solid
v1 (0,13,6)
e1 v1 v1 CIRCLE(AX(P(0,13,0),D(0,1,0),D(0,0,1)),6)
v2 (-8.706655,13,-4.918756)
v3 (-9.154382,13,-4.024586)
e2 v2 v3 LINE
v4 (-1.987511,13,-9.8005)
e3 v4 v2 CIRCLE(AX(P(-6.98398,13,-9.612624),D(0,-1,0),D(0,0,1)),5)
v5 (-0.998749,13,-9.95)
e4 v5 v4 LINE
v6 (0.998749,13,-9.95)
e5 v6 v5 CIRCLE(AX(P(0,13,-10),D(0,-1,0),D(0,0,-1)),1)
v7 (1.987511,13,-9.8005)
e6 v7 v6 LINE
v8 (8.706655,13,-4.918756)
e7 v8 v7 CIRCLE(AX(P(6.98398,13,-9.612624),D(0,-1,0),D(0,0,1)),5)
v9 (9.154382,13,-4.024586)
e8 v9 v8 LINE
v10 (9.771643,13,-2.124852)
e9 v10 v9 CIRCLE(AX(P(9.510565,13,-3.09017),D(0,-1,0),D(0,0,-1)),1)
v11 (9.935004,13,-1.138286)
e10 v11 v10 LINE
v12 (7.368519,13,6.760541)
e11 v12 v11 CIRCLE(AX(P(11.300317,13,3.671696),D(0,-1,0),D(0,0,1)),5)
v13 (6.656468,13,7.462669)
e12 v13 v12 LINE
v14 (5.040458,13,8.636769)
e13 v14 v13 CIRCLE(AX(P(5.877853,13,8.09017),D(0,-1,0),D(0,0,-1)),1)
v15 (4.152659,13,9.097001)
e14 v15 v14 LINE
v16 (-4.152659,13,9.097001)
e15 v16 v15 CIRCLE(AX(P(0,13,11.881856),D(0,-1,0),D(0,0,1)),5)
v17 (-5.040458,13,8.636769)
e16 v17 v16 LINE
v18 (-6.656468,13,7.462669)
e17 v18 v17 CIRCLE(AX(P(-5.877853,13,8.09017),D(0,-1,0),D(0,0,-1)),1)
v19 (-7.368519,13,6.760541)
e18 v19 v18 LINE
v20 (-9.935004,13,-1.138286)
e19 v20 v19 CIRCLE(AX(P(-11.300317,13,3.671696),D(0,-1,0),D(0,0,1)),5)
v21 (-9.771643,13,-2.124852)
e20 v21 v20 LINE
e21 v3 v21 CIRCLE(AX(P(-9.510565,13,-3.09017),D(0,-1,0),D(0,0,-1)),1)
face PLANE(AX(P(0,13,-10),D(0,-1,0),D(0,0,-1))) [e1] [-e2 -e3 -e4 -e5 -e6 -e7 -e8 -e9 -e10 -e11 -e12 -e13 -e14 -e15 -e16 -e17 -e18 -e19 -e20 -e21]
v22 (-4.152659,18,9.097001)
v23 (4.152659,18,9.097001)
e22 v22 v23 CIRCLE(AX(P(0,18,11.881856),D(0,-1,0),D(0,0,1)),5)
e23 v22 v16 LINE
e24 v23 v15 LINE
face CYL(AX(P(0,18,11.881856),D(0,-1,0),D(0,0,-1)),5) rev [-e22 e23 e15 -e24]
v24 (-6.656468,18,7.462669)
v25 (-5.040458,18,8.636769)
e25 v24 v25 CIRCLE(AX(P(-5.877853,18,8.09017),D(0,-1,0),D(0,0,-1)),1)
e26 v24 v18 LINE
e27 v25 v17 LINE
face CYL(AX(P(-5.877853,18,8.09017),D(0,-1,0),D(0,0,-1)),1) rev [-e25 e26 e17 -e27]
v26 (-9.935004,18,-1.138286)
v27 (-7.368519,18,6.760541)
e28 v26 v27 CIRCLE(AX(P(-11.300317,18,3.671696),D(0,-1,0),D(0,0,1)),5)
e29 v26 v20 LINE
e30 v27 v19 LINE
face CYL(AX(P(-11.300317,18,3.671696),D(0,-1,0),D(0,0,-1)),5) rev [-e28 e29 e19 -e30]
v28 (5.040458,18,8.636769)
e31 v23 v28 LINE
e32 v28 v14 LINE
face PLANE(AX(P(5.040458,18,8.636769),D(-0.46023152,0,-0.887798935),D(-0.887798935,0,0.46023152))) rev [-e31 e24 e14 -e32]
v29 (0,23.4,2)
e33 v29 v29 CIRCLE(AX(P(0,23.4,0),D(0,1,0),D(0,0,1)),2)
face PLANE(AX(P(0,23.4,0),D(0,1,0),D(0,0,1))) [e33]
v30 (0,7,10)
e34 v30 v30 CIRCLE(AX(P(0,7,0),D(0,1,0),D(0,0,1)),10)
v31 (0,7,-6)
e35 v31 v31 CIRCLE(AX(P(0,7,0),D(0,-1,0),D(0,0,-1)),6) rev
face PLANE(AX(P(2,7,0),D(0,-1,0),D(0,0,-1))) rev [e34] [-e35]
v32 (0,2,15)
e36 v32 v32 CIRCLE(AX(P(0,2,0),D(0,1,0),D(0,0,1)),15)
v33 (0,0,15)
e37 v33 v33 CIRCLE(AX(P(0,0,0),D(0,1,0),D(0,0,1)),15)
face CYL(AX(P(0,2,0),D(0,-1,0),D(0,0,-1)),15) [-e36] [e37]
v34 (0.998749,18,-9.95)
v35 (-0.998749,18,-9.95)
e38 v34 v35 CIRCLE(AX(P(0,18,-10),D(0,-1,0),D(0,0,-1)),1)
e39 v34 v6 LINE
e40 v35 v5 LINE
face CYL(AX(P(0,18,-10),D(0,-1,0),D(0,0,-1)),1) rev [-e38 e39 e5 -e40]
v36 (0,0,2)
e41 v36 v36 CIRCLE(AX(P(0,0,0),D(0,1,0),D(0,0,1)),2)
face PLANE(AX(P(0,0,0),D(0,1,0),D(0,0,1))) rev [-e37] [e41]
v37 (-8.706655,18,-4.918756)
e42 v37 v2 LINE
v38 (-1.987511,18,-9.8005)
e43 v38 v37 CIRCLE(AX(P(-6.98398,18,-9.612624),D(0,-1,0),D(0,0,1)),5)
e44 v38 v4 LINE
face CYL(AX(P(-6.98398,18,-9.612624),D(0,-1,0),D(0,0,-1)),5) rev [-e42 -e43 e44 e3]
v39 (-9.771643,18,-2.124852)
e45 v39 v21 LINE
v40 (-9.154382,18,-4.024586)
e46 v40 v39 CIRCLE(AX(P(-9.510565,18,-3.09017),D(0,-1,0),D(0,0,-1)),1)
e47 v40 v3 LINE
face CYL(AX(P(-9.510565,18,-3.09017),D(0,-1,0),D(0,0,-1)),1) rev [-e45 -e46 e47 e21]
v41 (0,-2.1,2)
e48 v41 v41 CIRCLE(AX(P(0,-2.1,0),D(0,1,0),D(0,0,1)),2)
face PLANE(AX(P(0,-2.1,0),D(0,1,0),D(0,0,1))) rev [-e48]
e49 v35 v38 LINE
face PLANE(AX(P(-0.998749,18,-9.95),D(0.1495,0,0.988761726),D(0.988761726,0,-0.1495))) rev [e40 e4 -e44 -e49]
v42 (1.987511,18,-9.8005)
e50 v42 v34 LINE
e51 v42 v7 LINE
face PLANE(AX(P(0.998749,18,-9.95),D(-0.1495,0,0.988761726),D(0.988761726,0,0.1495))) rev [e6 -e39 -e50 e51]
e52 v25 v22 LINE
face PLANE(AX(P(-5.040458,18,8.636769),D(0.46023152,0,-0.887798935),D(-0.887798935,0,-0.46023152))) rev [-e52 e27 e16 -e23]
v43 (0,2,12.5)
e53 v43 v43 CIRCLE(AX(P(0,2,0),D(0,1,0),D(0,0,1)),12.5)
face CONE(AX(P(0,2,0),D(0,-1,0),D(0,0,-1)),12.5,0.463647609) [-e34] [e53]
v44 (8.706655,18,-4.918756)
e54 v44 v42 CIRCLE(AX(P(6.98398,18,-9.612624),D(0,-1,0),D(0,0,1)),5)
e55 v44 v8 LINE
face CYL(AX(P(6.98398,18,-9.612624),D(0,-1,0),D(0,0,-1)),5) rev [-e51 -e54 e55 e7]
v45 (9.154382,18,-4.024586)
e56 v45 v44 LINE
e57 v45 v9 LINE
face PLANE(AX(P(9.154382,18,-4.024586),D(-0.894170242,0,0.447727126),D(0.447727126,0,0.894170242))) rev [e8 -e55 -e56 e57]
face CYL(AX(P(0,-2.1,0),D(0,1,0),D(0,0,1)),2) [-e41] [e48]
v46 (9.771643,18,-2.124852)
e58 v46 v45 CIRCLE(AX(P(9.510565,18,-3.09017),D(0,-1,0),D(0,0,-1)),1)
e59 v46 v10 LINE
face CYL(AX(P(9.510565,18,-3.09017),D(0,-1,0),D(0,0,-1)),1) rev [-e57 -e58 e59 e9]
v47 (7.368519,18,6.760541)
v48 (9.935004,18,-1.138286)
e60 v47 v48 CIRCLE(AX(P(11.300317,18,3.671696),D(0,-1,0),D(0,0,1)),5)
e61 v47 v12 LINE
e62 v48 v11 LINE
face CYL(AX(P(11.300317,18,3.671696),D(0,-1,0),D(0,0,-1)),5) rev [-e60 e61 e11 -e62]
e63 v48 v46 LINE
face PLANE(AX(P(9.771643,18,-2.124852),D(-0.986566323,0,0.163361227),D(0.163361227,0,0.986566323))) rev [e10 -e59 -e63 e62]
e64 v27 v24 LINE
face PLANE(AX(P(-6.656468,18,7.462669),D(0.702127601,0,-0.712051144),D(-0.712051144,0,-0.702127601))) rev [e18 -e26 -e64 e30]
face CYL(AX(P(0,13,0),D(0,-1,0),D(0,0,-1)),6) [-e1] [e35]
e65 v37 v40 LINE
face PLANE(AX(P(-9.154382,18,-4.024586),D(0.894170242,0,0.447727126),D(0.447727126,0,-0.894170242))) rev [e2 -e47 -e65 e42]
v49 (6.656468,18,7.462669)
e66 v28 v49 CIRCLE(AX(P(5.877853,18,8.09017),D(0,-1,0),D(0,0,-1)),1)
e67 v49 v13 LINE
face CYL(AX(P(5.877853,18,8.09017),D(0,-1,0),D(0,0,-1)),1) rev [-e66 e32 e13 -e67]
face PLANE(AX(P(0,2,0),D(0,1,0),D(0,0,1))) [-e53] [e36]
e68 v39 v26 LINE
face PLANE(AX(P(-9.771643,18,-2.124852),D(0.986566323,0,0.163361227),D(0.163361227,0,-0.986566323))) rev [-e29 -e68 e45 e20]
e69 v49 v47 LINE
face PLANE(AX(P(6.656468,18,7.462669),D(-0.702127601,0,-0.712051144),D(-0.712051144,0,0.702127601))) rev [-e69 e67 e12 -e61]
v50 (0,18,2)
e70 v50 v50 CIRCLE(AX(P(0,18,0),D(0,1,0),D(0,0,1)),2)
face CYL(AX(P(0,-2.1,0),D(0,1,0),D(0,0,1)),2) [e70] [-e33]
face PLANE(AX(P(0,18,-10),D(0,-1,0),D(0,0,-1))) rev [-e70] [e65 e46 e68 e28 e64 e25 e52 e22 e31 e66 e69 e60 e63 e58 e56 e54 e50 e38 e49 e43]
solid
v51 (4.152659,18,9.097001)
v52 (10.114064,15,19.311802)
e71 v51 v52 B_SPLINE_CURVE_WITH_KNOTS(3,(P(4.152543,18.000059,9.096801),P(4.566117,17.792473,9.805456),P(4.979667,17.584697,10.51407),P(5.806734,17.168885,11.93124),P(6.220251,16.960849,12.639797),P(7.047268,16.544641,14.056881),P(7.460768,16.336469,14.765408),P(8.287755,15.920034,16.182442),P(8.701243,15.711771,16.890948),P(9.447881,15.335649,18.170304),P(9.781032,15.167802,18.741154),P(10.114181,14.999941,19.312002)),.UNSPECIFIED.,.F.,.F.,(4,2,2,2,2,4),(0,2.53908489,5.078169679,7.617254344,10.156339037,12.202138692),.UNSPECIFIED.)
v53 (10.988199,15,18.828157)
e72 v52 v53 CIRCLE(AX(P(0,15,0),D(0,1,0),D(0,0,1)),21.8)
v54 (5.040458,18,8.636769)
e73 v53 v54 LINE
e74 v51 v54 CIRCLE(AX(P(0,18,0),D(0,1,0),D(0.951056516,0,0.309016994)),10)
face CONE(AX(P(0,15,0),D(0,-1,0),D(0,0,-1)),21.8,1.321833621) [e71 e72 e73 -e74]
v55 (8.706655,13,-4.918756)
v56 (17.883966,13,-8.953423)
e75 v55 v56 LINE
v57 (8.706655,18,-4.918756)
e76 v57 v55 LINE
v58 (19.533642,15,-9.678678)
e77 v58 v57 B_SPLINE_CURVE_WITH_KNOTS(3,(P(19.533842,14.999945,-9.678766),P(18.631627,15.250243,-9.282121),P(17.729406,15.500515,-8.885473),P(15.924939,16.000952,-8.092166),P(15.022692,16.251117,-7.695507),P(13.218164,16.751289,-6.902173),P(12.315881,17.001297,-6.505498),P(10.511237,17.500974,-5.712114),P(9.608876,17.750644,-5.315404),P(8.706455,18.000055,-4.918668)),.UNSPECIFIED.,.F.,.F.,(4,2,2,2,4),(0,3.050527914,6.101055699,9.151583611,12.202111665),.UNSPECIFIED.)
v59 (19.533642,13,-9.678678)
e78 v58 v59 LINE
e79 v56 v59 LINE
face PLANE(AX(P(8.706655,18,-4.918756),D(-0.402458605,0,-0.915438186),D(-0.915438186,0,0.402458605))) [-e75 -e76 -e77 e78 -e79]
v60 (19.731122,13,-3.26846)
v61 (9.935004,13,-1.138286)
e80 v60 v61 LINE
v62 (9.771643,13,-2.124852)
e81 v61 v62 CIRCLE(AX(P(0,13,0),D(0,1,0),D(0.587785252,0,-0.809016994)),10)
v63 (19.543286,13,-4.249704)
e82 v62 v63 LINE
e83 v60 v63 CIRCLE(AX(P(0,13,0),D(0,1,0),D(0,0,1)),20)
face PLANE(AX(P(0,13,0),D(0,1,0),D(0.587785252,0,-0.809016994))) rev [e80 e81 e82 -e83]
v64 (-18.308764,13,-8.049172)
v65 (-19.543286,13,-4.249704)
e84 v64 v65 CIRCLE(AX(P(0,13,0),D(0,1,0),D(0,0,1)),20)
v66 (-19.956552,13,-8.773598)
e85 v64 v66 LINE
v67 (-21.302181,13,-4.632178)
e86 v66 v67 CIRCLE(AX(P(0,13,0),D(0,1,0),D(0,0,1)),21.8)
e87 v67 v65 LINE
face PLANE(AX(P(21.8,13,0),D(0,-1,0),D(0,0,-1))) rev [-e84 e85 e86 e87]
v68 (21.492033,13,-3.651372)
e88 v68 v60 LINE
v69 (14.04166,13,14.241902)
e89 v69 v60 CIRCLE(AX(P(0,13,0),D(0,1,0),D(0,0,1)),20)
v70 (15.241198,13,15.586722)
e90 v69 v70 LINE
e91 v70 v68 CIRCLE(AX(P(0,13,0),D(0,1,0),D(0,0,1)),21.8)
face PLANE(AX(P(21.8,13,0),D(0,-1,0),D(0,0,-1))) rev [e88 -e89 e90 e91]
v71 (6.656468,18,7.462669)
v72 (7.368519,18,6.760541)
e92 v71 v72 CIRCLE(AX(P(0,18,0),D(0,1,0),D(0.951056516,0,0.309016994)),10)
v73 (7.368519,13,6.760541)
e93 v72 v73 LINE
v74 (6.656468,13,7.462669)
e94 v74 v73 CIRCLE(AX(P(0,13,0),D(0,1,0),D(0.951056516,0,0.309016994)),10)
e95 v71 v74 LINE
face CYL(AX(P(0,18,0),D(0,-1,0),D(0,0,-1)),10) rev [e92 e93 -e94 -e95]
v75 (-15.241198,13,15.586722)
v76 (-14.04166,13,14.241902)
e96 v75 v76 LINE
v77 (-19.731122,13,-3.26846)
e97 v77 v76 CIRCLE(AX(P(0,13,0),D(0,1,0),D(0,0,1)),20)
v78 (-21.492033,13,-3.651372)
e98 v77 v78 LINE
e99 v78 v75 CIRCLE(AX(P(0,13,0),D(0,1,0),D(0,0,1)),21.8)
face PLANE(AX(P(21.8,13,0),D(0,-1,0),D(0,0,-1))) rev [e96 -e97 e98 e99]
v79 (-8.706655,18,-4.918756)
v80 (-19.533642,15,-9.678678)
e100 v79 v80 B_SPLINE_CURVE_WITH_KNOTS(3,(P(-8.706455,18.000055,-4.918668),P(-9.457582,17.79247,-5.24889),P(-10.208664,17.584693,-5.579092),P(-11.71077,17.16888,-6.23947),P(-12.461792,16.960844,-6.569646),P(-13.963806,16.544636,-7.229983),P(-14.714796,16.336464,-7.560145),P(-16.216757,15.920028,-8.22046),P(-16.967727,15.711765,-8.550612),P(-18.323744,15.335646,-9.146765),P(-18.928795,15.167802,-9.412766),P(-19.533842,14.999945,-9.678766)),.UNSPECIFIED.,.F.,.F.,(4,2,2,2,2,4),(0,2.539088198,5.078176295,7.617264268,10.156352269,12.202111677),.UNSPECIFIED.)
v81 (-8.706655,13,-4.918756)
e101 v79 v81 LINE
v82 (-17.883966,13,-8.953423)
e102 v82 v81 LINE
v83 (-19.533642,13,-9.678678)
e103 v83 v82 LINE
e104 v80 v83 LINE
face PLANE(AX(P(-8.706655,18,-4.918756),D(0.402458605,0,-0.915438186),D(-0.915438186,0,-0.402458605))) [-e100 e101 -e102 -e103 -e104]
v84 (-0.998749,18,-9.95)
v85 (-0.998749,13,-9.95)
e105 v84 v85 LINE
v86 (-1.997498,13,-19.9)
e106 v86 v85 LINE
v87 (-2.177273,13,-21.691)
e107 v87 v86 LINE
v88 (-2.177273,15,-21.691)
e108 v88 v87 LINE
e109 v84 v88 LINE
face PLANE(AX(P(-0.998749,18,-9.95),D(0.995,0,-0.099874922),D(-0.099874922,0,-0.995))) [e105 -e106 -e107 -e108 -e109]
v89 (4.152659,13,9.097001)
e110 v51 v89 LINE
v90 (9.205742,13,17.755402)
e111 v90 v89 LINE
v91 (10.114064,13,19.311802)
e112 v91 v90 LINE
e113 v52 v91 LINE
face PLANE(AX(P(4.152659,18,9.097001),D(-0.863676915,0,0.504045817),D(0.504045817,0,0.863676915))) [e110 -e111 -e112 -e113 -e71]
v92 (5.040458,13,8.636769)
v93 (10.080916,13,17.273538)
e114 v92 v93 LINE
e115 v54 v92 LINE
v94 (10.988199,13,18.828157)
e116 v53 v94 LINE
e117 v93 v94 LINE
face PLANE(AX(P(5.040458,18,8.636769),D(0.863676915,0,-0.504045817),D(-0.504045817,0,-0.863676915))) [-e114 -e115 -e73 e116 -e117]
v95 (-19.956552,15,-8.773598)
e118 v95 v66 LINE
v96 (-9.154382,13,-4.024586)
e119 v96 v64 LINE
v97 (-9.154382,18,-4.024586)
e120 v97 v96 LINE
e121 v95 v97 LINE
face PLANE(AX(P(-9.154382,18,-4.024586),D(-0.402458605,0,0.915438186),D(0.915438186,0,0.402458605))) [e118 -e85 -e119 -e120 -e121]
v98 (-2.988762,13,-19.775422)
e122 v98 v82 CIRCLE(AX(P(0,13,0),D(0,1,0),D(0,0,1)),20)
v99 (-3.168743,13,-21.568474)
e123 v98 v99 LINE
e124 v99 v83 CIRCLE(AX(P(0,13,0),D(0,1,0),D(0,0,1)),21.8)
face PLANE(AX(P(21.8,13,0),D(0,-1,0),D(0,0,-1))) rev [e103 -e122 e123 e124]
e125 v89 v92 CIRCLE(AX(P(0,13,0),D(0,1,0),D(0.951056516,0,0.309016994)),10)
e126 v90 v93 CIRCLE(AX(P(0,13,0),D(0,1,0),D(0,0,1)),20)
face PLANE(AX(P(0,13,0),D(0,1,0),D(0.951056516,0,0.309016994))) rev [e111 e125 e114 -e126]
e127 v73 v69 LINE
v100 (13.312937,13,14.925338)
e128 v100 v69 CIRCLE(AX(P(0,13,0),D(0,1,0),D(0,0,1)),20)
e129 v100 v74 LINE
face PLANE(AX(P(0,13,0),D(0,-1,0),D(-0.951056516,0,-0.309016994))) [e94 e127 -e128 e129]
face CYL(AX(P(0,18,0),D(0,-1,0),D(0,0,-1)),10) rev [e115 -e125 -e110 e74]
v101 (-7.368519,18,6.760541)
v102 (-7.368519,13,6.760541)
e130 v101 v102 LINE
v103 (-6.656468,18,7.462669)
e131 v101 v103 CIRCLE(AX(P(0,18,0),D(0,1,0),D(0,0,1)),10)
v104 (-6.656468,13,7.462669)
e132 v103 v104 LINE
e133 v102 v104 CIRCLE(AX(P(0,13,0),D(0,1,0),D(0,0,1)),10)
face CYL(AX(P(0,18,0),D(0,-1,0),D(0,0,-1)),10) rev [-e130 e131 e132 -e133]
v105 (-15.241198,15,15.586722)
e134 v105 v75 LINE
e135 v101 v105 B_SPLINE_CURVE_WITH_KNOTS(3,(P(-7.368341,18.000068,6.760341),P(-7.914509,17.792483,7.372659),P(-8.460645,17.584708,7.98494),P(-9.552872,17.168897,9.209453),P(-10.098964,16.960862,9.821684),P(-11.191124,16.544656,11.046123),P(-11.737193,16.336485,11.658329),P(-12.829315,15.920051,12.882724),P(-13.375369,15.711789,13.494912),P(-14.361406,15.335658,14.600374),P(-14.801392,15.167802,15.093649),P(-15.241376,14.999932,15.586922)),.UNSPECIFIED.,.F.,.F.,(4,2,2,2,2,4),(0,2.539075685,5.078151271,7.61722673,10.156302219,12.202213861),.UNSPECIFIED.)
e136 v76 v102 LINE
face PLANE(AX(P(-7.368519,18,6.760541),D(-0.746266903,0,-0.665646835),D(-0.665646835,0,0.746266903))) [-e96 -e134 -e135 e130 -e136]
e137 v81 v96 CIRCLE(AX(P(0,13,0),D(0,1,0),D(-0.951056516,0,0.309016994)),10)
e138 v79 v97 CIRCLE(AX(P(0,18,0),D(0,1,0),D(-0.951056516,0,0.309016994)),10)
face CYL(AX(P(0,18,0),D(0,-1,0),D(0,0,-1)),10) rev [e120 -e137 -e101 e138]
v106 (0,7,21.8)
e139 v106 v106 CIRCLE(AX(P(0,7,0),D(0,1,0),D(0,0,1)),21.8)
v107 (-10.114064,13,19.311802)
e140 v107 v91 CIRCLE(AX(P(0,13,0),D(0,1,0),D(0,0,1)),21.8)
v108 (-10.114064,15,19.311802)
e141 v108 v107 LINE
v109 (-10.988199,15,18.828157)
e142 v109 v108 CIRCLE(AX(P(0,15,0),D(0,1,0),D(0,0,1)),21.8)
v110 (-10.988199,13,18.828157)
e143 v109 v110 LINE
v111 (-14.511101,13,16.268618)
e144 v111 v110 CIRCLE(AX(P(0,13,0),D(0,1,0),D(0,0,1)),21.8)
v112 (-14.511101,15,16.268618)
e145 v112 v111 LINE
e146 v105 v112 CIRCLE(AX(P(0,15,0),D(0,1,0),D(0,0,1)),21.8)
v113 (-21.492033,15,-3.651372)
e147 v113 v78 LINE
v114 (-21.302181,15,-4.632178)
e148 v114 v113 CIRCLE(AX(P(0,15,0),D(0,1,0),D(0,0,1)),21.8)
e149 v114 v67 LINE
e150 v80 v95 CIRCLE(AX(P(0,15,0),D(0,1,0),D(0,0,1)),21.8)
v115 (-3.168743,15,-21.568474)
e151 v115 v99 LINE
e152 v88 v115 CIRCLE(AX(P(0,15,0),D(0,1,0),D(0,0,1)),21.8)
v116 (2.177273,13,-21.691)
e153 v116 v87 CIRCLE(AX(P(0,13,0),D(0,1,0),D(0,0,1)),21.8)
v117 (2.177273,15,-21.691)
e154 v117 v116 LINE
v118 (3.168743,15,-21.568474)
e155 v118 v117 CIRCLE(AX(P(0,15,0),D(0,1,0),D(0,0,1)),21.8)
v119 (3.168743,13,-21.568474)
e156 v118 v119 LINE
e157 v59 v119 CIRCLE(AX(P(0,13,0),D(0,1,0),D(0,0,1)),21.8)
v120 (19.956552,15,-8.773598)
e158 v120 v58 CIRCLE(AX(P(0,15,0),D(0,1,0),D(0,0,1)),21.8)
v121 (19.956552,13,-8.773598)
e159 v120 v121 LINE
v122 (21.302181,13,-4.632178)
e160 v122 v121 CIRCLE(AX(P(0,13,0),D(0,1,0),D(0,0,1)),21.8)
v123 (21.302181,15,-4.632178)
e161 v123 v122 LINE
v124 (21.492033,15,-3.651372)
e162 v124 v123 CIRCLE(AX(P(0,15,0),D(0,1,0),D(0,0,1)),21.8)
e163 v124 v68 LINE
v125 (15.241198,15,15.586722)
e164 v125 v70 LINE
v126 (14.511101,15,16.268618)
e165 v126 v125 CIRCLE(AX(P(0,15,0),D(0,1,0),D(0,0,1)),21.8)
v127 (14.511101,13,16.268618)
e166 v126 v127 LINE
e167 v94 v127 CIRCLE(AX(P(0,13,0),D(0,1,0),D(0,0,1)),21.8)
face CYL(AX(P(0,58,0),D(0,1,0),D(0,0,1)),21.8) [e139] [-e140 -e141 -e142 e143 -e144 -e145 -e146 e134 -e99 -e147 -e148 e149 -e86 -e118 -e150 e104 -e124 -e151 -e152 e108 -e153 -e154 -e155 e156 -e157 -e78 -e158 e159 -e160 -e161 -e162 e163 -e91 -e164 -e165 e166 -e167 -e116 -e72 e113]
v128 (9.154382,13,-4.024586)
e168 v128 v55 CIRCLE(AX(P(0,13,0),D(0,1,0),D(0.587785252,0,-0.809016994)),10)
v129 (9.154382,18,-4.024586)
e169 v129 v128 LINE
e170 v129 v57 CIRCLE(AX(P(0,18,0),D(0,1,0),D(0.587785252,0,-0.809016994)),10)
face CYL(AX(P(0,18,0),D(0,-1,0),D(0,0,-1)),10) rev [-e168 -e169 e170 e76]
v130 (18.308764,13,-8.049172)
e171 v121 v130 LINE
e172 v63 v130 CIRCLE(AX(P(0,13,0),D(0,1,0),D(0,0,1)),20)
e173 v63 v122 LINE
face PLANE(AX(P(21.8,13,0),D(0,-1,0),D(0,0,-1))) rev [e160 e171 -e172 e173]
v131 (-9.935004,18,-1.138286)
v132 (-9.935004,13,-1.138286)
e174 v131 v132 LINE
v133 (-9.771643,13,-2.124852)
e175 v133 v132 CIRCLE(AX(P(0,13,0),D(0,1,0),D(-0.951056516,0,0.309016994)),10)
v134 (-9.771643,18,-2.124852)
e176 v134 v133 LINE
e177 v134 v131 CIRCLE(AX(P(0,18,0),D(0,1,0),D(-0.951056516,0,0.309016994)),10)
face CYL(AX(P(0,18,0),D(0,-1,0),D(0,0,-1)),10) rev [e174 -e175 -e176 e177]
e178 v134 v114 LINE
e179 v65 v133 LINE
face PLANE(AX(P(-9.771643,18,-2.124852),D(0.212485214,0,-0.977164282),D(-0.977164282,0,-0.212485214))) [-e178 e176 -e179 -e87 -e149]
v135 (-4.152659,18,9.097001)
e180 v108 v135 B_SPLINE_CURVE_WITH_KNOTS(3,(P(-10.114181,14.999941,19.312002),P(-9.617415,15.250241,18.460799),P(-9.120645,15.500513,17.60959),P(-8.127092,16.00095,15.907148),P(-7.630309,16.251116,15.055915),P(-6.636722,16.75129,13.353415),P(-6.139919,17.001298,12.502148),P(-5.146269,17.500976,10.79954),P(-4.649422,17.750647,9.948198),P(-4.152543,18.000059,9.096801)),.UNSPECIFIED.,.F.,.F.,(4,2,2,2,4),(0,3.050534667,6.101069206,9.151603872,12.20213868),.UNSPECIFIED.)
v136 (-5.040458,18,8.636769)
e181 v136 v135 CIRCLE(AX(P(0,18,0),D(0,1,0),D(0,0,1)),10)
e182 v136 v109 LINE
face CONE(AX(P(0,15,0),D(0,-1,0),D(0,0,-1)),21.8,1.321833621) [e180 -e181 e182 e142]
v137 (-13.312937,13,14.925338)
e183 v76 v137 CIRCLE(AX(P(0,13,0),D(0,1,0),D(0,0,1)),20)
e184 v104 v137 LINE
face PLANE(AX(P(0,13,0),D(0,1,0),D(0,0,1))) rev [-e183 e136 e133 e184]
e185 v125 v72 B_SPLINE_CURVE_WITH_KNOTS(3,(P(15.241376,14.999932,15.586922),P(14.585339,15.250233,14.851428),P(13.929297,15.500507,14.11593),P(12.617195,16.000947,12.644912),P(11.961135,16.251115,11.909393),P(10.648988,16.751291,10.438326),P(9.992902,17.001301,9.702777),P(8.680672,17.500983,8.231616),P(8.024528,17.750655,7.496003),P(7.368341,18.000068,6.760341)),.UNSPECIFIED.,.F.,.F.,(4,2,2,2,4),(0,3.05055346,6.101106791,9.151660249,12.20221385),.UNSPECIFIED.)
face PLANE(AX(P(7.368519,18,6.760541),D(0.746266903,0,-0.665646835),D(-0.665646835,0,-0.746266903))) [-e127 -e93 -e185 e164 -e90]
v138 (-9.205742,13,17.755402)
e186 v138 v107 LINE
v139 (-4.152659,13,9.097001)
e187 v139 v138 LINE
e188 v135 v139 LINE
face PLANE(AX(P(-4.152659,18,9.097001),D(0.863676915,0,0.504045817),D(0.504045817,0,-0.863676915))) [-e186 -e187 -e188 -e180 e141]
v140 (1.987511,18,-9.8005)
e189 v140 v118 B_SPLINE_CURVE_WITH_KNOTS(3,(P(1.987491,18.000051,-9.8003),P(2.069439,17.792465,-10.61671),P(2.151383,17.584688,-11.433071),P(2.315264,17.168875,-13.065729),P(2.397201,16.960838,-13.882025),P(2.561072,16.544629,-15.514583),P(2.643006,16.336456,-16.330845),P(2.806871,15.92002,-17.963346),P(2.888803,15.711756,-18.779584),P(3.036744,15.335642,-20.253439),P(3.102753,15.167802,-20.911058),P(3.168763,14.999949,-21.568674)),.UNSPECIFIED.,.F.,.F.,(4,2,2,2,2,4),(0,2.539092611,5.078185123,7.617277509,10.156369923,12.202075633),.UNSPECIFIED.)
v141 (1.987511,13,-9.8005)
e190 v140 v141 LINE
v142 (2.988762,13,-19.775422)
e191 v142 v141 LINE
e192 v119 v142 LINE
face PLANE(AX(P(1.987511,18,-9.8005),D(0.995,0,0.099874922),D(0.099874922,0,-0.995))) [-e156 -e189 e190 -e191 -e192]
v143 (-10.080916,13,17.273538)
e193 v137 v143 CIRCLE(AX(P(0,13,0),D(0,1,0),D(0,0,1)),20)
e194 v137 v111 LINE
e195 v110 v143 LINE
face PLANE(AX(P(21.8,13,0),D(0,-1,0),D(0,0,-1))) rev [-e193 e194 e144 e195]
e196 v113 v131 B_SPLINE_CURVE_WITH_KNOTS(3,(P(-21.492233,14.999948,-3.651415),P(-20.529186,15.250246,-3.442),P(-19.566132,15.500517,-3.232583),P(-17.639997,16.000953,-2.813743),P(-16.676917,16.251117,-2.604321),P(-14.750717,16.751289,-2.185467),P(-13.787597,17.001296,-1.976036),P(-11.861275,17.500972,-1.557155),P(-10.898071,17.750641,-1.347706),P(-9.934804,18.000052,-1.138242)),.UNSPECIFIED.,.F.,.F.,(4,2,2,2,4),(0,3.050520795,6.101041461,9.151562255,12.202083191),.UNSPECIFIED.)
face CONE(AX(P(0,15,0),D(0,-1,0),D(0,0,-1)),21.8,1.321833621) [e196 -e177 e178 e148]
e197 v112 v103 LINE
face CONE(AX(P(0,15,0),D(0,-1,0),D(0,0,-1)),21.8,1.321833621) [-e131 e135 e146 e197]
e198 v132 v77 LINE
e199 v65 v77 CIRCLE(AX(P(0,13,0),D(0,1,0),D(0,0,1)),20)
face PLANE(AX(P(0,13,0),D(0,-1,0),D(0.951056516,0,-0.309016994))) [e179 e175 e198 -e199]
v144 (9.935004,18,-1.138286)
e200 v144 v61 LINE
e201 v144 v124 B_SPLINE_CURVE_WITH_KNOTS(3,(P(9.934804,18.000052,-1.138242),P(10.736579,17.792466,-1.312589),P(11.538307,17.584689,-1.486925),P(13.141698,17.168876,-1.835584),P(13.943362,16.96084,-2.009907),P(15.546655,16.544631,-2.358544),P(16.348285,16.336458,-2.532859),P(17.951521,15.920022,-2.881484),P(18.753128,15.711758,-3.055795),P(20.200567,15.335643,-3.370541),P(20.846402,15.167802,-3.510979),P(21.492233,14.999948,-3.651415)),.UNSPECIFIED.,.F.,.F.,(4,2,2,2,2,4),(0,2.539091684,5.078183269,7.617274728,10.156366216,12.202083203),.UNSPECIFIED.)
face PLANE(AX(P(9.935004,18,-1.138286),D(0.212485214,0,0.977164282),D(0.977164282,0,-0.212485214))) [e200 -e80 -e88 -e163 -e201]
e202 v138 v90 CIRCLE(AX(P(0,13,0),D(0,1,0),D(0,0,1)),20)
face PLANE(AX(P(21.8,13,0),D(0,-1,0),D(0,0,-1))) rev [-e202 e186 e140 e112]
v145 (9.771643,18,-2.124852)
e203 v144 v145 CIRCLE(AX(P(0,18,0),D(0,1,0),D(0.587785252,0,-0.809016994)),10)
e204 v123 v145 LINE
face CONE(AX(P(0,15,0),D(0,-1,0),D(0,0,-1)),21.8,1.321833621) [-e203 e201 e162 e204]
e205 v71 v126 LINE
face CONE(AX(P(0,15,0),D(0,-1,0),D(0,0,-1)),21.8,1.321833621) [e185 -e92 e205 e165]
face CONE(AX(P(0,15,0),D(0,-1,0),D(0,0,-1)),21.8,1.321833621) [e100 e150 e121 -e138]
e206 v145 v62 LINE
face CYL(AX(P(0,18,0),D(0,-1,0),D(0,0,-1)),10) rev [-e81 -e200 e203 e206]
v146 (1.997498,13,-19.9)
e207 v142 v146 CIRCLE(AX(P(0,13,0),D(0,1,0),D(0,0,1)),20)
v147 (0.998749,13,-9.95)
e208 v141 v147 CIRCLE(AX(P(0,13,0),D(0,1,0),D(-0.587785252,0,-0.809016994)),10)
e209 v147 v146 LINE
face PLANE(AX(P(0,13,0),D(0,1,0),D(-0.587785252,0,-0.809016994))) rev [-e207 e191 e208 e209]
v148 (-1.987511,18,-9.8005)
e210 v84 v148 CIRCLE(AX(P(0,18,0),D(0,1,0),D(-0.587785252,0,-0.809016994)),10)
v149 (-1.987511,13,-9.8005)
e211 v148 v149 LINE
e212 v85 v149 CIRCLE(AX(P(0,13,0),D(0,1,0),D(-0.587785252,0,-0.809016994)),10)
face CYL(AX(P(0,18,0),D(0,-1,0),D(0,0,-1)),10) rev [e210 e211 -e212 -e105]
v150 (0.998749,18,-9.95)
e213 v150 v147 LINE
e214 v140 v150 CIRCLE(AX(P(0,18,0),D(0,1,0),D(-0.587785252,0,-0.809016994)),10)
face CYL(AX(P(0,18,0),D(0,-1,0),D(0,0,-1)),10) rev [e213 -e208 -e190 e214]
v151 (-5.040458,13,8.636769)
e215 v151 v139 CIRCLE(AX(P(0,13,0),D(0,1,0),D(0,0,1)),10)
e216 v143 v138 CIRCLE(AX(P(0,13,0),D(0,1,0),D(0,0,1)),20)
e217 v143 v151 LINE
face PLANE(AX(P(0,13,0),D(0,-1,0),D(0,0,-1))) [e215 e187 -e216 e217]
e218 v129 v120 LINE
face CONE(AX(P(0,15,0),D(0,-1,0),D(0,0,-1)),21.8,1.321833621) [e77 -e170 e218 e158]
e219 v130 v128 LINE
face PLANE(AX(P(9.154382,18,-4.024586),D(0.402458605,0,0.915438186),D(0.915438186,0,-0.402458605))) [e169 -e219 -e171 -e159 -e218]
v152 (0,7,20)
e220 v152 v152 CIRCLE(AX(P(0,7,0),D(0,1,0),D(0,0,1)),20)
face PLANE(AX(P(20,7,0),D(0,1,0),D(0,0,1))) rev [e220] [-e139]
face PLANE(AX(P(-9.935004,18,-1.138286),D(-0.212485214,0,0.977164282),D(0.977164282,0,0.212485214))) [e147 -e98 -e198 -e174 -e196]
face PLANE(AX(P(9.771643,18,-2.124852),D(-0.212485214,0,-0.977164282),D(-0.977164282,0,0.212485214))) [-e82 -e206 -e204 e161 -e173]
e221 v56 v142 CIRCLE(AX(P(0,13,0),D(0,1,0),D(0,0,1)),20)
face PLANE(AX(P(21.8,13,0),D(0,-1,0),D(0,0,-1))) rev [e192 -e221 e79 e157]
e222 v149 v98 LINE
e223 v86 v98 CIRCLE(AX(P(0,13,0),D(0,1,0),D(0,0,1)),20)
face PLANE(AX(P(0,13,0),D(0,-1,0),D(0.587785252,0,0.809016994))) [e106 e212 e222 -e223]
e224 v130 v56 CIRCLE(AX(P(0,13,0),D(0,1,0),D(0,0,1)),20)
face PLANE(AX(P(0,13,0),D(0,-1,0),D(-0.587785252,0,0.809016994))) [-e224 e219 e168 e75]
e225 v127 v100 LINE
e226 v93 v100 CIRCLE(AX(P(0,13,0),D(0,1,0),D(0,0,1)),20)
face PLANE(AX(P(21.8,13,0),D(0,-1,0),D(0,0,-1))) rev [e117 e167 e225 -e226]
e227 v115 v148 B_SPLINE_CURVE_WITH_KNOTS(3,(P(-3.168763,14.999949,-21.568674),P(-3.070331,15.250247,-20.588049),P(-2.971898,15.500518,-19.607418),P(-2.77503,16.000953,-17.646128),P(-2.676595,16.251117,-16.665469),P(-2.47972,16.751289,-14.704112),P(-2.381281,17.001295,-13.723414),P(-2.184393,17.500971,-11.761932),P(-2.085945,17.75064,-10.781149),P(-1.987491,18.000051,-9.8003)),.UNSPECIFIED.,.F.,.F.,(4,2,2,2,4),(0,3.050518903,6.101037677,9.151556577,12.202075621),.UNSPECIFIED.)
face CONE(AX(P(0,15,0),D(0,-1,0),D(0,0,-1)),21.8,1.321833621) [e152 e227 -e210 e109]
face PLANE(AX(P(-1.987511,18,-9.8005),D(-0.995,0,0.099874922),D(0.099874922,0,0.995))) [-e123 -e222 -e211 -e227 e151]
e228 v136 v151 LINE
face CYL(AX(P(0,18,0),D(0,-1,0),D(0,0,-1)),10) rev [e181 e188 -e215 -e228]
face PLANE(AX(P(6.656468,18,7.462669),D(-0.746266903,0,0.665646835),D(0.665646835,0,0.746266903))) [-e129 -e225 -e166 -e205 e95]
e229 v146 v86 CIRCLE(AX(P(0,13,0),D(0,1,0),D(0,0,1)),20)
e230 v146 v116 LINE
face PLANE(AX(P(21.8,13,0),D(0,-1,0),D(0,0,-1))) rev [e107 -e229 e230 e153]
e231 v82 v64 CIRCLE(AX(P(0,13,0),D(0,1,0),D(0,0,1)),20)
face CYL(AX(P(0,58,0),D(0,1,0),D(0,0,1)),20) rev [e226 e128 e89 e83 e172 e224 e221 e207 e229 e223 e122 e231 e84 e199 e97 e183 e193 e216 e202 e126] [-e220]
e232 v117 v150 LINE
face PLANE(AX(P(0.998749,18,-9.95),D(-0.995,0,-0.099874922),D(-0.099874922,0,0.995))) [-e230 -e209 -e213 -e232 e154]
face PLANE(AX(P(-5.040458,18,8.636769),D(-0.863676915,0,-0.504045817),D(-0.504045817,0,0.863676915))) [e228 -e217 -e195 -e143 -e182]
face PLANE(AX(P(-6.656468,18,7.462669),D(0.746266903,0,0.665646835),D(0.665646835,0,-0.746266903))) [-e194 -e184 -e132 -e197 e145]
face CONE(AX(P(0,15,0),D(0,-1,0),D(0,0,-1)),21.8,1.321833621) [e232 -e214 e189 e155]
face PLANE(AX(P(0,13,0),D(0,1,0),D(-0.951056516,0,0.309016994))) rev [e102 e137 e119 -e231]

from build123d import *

# Parameters (mm, degrees)
SKETCH_4_R               = 15
EXTRUDE_2_DEPTH          = 2
EXTRUDE_3_DEPTH          = 21.4
EXTRUDE_3_DEPTH_BACK     = 4.1
SKETCH_5_R               = 2
SKETCH_9_W               = 1.8
SKETCH_9_H               = 6
SKETCH_10_R              = 6
SKETCH_10_R_2            = 2
EXTRUDE_5_DEPTH          = 6
SKETCH_11_R              = 2
EXTRUDE_6_DEPTH          = 5
EXTRUDE_7_DEPTH          = 5
PATTERN_START            = 13
PATTERN_CIRCULAR_1_DEPTH = 5


# Read off the part's stored shape, not the designer's step: 阵列(圆周)1
with BuildPart() as part:
    # 草图4 → 凸台-拉伸2 (new body)
    with BuildSketch(Plane(origin=(0, 0, 0), x_dir=(1, 0, 0), z_dir=(0, 1, 0))):
        with Locations(Location((0, 0, 0), (0, 0, 270))):
            Circle(SKETCH_4_R)
    extrude(amount=EXTRUDE_2_DEPTH)

    # 草图5 → 凸台-拉伸3 (add, two sides: drawn at the far end of the back side and taken through both)
    with BuildSketch(Plane(origin=(0, 2, 0), x_dir=(1, 0, 0), z_dir=(0, 1, 0)).offset(-EXTRUDE_3_DEPTH_BACK)):
        with Locations(Location((0, 0, 0), (0, 0, 270))):
            Circle(SKETCH_5_R)
    extrude(amount=EXTRUDE_3_DEPTH + EXTRUDE_3_DEPTH_BACK)

    # 草图8 → 旋转2 (revolve)
    with BuildSketch(Plane.XY, mode=Mode.PRIVATE) as revolve_2_sk:
        Polygon((2, 2), (2, 7), (10, 7), (12.5, 2), align=None)
    revolve(revolve_2_sk.sketch.rotate(Axis((0, 58, 0), (0, -1, 0)), 90), axis=Axis((0, 58, 0), (0, -1, 0)))

    # 草图10 → 凸台-拉伸5 (add)
    with BuildSketch(Plane(origin=(0, 7, 0), x_dir=(1, 0, 0), z_dir=(0, 1, 0))):
        with Locations(Location((0, 0, 0), (0, 0, 90))):
            Circle(SKETCH_10_R)
        with Locations(Location((0, 0, 0), (0, 0, 270))):
            Circle(SKETCH_10_R_2, mode=Mode.SUBTRACT)
    extrude(amount=EXTRUDE_5_DEPTH)

    # 草图11 → 凸台-拉伸6 (add)
    with BuildSketch(Plane(origin=(0, 13, 0), x_dir=(1, 0, 0), z_dir=(0, 1, 0))):
        with BuildLine():
            Line((0.998749218, 9.95), (1.987510943, 9.8005))
            ThreePointArc((1.987510943, 9.8005), (4.045053686, 5.567538761), (8.70665473, 4.918756287))
            Line((8.70665473, 4.918756287), (9.154381856, 4.024586046))
            ThreePointArc((9.154381856, 4.024586046), (8.559508647, 2.781152949), (9.771642819, 2.124852142))
            Line((9.771642819, 2.124852142), (9.935004046, 1.138285819))
            ThreePointArc((9.935004046, 1.138285819), (6.54503435, -2.126610573), (7.368519495, -6.760541432))
            Line((7.368519495, -6.760541432), (6.656468351, -7.462669033))
            ThreePointArc((6.656468351, -7.462669033), (5.290067271, -7.281152949), (5.04045817, -8.636769155))
            Line((5.04045817, -8.636769155), (4.152659235, -9.097000675))
            ThreePointArc((4.152659235, -9.097000675), (0, -6.881856376), (-4.152659235, -9.097000675))
            Line((-4.152659235, -9.097000675), (-5.04045817, -8.636769155))
            ThreePointArc((-5.04045817, -8.636769155), (-5.290067271, -7.281152949), (-6.656468351, -7.462669033))
            Line((-6.656468351, -7.462669033), (-7.368519495, -6.760541432))
            ThreePointArc((-7.368519495, -6.760541432), (-6.54503435, -2.126610573), (-9.935004046, 1.138285819))
            Line((-9.935004046, 1.138285819), (-9.771642819, 2.124852142))
            ThreePointArc((-9.771642819, 2.124852142), (-8.559508647, 2.781152949), (-9.154381856, 4.024586046))
            Line((-9.154381856, 4.024586046), (-8.70665473, 4.918756287))
            ThreePointArc((-8.70665473, 4.918756287), (-4.045053686, 5.567538761), (-1.987510943, 9.8005))
            Line((-1.987510943, 9.8005), (-0.998749218, 9.95))
            ThreePointArc((-0.998749218, 9.95), (0, 9), (0.998749218, 9.95))
        make_face()
        with Locations(Location((0, 0, 0), (0, 0, 270))):
            Circle(SKETCH_11_R, mode=Mode.SUBTRACT)
    extrude(amount=EXTRUDE_6_DEPTH)


with BuildPart() as body_2:
    # 草图9 → 旋转3 (revolve)
    with BuildSketch(Plane.XY, mode=Mode.PRIVATE) as revolve_3_sk:
        with Locations((20.9, 10)):
            Rectangle(SKETCH_9_W, SKETCH_9_H)
    revolve(revolve_3_sk.sketch.rotate(Axis((0, 58, 0), (0, -1, 0)), 90), axis=Axis((0, 58, 0), (0, -1, 0)))

    # 草图13 → 凸台-拉伸7 (add)
    with BuildSketch(Plane.XZ.offset(-13)):
        with BuildLine():
            Line((-6.656468351, 7.462669033), (-14.511101004, 16.268618492))
            ThreePointArc((-14.511101004, 16.268618492), (-14.880055872, 15.931852913), (-15.241197529, 15.586721845))
            Line((-15.241197529, 15.586721845), (-7.368519495, 6.760541432))
            ThreePointArc((-7.368519495, 6.760541432), (-7.02127601, 7.120511442), (-6.656468351, 7.462669033))
        make_face()
        with BuildLine():
            Line((-5.04045817, 8.636769155), (-10.988198811, 18.828156758))
            ThreePointArc((-10.988198811, 18.828156758), (-10.553902387, 19.074987402), (-10.114064327, 19.311802163))
            Line((-10.114064327, 19.311802163), (-4.152659235, 9.097000675))
            ThreePointArc((-4.152659235, 9.097000675), (-4.602315197, 8.877989346), (-5.04045817, 8.636769155))
        make_face()
    extrude(amount=-EXTRUDE_7_DEPTH)

    # 阵列(圆周)1 outline → 阵列(圆周)1 (add)
    with BuildSketch(Plane(origin=(0, 0, 0), x_dir=(1, 0, 0), z_dir=(0, 1, 0)).offset(PATTERN_START)):
        with BuildLine():
            Line((-19.956552445, 8.77359758), (-9.154381856, 4.024586046))
            ThreePointArc((-9.154381856, 4.024586046), (-8.941702415, 4.477271258), (-8.70665473, 4.918756287))
            Line((-8.70665473, 4.918756287), (-19.533642429, 9.67867829))
            ThreePointArc((-19.533642429, 9.67867829), (-19.750282671, 9.228560799), (-19.956552445, 8.77359758))
        make_face()
        with BuildLine():
            Line((-9.771642819, 2.124852142), (-21.302181344, 4.63217767))
            ThreePointArc((-21.302181344, 4.63217767), (-21.402726262, 4.142862363), (-21.492033048, 3.651371724))
            Line((-21.492033048, 3.651371724), (-9.935004046, 1.138285819))
            ThreePointArc((-9.935004046, 1.138285819), (-9.865663228, 1.633612274), (-9.771642819, 2.124852142))
        make_face()
        with BuildLine():
            ThreePointArc((-2.177273295, 21.691), (-2.673709895, 21.635417153), (-3.168742584, 21.568473994))
            Line((-3.168742584, 21.568473994), (-1.987510943, 9.8005))
            ThreePointArc((-1.987510943, 9.8005), (-1.495, 9.887617256), (-0.998749218, 9.95))
            Line((-0.998749218, 9.95), (-2.177273295, 21.691))
        make_face()
        with BuildLine():
            Line((4.152659235, -9.097000675), (10.114064327, -19.311802163))
            ThreePointArc((10.114064327, -19.311802163), (10.553902388, -19.074987402), (10.988198811, -18.828156758))
            Line((10.988198811, -18.828156758), (5.04045817, -8.636769155))
            ThreePointArc((5.04045817, -8.636769155), (4.602315197, -8.877989346), (4.152659235, -9.097000675))
        make_face()
        with BuildLine():
            ThreePointArc((3.168742584, 21.568473994), (2.673709895, 21.635417153), (2.177273295, 21.691))
            Line((2.177273295, 21.691), (0.998749218, 9.95))
            ThreePointArc((0.998749218, 9.95), (1.495, 9.887617256), (1.987510943, 9.8005))
            Line((1.987510943, 9.8005), (3.168742584, 21.568473994))
        make_face()
        with BuildLine():
            Line((6.656468351, -7.462669033), (14.511101004, -16.268618492))
            ThreePointArc((14.511101004, -16.268618492), (14.880055872, -15.931852913), (15.241197529, -15.586721845))
            Line((15.241197529, -15.586721845), (7.368519495, -6.760541432))
            ThreePointArc((7.368519495, -6.760541432), (7.02127601, -7.120511442), (6.656468351, -7.462669033))
        make_face()
        with BuildLine():
            ThreePointArc((19.956552445, 8.77359758), (19.750282671, 9.228560799), (19.533642429, 9.67867829))
            Line((19.533642429, 9.67867829), (8.70665473, 4.918756287))
            ThreePointArc((8.70665473, 4.918756287), (8.941702415, 4.477271258), (9.154381856, 4.024586046))
            Line((9.154381856, 4.024586046), (19.956552445, 8.77359758))
        make_face()
        with BuildLine():
            ThreePointArc((21.492033048, 3.651371724), (21.402726262, 4.142862363), (21.302181344, 4.63217767))
            Line((21.302181344, 4.63217767), (9.771642819, 2.124852142))
            ThreePointArc((9.771642819, 2.124852142), (9.865663228, 1.633612274), (9.935004046, 1.138285819))
            Line((9.935004046, 1.138285819), (21.492033048, 3.651371724))
        make_face()
    extrude(amount=PATTERN_CIRCULAR_1_DEPTH)

    # 草图16 → 切除-旋转1 (revolve, cut)
    with BuildSketch(Plane(origin=(0, 0, 0), x_dir=(0.6656468350603115, 0, -0.7462669033088567), z_dir=(0.7462669033088567, 0, 0.6656468350603115))):
        Polygon((-21.8, 18), (-21.8, 15), (-10, 18), align=None)
    revolve(axis=Axis((0, 58, 0), (0, -1, 0)), mode=Mode.SUBTRACT)


solid = Compound([part.part, body_2.part])
